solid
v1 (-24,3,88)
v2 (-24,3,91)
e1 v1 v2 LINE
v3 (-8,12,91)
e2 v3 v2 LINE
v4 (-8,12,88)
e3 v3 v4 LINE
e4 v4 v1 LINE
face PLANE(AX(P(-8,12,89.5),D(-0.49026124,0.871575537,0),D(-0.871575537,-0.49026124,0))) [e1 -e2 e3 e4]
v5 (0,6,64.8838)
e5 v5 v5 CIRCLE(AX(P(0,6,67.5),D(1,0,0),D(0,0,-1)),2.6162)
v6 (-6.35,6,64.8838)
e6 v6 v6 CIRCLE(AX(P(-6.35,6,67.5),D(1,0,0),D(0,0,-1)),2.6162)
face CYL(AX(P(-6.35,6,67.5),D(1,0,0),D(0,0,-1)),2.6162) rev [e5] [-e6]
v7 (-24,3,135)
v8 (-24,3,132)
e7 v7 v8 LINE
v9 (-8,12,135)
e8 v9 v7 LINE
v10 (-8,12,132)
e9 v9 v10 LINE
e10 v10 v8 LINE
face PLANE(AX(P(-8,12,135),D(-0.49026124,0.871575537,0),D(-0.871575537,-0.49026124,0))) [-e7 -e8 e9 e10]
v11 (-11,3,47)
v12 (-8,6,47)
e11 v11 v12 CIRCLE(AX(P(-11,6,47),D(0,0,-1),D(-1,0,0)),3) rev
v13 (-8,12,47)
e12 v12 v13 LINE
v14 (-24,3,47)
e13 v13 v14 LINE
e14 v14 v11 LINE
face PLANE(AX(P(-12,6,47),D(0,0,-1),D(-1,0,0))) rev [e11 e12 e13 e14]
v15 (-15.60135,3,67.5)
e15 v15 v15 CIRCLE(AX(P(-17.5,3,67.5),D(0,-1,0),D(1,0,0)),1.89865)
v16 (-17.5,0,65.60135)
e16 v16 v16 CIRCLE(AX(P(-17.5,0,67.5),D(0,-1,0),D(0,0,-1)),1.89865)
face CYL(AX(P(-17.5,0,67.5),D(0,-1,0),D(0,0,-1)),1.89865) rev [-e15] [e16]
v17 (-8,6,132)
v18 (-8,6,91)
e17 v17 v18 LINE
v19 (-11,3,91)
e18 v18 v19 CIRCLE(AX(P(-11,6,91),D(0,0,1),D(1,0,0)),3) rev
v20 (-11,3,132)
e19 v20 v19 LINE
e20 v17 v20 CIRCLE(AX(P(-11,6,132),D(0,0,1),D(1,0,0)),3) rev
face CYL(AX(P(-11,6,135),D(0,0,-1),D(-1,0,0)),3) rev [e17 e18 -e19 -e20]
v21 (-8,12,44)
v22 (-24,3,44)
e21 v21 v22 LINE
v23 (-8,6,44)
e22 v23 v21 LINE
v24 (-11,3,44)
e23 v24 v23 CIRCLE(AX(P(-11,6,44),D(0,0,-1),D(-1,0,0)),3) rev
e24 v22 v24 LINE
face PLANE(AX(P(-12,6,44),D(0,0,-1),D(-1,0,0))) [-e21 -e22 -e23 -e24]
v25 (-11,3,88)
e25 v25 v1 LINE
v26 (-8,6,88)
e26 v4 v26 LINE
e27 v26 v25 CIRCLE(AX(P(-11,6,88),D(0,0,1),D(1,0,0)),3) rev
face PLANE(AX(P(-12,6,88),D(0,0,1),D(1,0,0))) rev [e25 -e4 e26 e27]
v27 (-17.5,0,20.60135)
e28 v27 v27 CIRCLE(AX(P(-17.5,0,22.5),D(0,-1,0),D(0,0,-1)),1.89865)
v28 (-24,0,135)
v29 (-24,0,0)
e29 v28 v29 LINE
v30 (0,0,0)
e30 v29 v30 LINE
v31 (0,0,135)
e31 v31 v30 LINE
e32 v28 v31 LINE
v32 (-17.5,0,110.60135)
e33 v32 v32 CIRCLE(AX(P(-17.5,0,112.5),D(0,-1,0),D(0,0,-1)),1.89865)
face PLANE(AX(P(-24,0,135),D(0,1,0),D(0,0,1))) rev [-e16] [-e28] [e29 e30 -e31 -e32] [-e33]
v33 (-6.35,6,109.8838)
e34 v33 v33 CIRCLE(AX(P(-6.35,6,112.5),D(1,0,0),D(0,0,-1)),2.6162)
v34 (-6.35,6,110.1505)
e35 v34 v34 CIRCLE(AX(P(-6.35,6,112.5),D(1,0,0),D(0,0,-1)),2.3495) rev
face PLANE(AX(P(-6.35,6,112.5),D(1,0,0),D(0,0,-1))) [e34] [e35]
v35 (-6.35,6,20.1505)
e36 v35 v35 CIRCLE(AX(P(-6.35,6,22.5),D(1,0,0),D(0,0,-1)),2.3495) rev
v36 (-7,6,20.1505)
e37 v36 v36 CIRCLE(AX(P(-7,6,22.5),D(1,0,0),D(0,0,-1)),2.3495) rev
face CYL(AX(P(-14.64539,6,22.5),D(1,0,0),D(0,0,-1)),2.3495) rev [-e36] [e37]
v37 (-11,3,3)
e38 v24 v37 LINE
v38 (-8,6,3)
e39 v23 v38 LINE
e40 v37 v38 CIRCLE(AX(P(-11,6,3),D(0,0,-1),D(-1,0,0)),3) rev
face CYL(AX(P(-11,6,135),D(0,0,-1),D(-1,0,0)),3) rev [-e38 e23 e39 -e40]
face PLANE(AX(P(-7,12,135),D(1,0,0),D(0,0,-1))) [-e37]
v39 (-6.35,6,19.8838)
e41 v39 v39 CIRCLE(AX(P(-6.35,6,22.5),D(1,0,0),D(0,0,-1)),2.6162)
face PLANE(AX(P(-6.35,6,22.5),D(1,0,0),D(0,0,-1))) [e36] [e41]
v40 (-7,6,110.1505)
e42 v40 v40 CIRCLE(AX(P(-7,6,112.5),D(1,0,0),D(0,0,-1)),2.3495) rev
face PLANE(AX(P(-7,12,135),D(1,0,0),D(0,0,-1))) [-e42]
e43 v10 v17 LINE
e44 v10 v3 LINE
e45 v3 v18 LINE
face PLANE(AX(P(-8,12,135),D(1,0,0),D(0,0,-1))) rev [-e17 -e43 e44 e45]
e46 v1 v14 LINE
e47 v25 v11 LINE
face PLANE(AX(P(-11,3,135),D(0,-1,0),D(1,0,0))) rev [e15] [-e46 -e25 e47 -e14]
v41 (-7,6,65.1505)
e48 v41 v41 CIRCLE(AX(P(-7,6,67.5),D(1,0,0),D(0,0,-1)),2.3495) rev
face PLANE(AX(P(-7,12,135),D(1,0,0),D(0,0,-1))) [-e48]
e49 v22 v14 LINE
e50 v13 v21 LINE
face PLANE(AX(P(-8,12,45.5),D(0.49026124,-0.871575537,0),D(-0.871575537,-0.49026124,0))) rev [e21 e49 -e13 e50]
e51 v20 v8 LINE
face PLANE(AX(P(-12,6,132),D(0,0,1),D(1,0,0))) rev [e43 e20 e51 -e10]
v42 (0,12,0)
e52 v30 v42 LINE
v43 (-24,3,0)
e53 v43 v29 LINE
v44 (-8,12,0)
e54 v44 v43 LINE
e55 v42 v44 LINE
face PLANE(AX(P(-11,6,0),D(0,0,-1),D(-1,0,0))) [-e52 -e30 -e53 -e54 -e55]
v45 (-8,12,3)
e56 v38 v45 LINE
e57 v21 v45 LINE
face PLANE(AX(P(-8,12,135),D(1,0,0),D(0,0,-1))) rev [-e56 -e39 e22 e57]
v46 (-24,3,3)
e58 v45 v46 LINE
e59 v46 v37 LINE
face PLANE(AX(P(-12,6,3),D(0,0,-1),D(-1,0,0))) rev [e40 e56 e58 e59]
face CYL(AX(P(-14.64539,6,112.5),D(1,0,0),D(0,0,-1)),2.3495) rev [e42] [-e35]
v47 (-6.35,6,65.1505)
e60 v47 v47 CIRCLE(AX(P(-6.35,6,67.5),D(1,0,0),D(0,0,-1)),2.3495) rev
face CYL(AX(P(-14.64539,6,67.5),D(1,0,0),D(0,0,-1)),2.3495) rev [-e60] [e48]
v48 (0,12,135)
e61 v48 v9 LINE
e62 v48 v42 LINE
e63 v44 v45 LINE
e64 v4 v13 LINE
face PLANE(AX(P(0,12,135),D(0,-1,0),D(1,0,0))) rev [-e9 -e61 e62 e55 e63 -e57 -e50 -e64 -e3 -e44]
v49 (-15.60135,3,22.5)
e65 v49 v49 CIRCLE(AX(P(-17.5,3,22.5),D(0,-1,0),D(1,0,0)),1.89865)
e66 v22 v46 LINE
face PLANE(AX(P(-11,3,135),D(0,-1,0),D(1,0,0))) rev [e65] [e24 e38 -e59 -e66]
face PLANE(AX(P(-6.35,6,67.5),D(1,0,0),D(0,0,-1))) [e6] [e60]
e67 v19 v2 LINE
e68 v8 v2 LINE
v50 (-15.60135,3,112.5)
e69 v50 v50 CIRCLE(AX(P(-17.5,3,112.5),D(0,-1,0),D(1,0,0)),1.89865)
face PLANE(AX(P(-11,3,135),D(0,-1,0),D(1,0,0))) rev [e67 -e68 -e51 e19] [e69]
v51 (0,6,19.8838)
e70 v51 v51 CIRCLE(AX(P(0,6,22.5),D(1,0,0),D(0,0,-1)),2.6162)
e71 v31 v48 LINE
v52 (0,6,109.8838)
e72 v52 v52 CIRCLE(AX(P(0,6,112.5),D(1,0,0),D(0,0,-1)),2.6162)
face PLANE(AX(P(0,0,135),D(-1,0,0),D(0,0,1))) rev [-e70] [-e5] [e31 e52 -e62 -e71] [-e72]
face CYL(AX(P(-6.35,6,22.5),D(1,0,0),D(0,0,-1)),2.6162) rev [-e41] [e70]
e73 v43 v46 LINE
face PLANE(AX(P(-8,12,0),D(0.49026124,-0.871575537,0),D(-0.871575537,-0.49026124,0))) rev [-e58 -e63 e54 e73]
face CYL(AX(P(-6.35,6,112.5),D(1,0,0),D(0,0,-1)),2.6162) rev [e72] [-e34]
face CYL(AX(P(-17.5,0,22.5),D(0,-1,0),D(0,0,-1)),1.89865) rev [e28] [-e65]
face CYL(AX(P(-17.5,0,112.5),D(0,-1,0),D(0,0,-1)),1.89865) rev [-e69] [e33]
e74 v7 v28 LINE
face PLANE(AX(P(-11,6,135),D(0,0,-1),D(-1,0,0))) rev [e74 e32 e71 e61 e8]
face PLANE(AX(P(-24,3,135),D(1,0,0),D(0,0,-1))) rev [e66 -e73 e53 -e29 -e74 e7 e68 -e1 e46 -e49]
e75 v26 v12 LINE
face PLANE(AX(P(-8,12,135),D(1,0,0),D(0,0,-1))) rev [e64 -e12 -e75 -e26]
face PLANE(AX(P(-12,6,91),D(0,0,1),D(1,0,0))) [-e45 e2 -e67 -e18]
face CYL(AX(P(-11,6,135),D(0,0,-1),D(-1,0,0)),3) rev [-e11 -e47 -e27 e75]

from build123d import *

# Parameters (mm, degrees)
BOSS_EXTRUDE1_DEPTH   = 135
RIB3_REACH            = 95.436
SKETCH4_WALL_W        = 207.229173432
SKETCH4_WALL_H        = 3
RIB4_START            = -3
RIB4_DEPTH            = 3
F_6_CLEARANCE_HOLE1_D = 3.7973
SKETCH6_R             = 2.3495
CUT_EXTRUDE1_DEPTH    = 7
SKETCH12_R            = 2.6162
CUT_EXTRUDE2_DEPTH    = 6.35


# Read off the part's stored shape, not the designer's step: Rib4
with BuildPart() as part:
    # Sketch1 → Boss-Extrude1 (new body)
    with BuildSketch(Plane.XY):
        with BuildLine():
            Line((0, 0), (0, 12))
            Line((0, 12), (-8, 12))
            Line((-8, 12), (-8, 6))
            ThreePointArc((-8, 6), (-8.878679656, 3.878679656), (-11, 3))
            Line((-11, 3), (-24, 3))
            Line((-24, 3), (-24, 0))
            Line((-24, 0), (0, 0))
        make_face()
    extrude(amount=BOSS_EXTRUDE1_DEPTH)

    # Sketch4 wall → Rib3 (add, up to next)
    with BuildSketch(Plane(origin=(-16, 7.5, 45.5), x_dir=(-0.871575537125, -0.490261239633, 0), z_dir=(-0.490261239633, 0.871575537125, 0)), mode=Mode.PRIVATE) as rib3_sk1:
        Rectangle(SKETCH4_WALL_W, SKETCH4_WALL_H)
    rib3_tool1 = extrude(rib3_sk1.sketch, amount=-RIB3_REACH, mode=Mode.PRIVATE) - part.part
    rib3 = rib3_tool1.solids().sort_by_distance((-16, 7.5, 45.5))[0]
    add(rib3)

    # Rib4 outline → Rib4 (add)
    with BuildSketch(Plane(origin=(0, 0, 0), x_dir=(-1, 0, 0), z_dir=(0, 0, -1)).offset(RIB4_START)):
        with BuildLine():
            Line((24, 3), (8, 12))
            Line((8, 12), (8, 6))
            ThreePointArc((8, 6), (8.878679656, 3.878679656), (11, 3))
            Line((11, 3), (24, 3))
        make_face()
    rib4 = extrude(amount=RIB4_DEPTH)

    # Mirror1: Rib3, Rib4 across plane
    add(rib3.mirror(Plane(origin=(0, 0, 67.5), x_dir=(1, 0, 0), z_dir=(0, 0, -1))))
    add(rib4.mirror(Plane(origin=(0, 0, 67.5), x_dir=(1, 0, 0), z_dir=(0, 0, -1))))

    # #6 Clearance Hole1 (through all)
    with Locations(Plane(origin=(0, 0, 0), x_dir=(-1, 0, 0), z_dir=(0, -1, 0))):
        with Locations((17.5, -22.5), (17.5, -112.5), (17.5, -67.5)):
            Hole(F_6_CLEARANCE_HOLE1_D / 2)

    # Sketch6 → Cut-Extrude1 (cut)
    with BuildSketch(Plane(origin=(0, 0, 0), x_dir=(0, 0, -1), z_dir=(1, 0, 0))):
        with Locations((-112.5, 6)):
            Circle(SKETCH6_R)
        with Locations((-67.5, 6)):
            Circle(SKETCH6_R)
        with Locations((-22.5, 6)):
            Circle(SKETCH6_R)
    extrude(amount=-CUT_EXTRUDE1_DEPTH, mode=Mode.SUBTRACT)

    # Sketch12 → Cut-Extrude2 (cut)
    with BuildSketch(Plane(origin=(0, 0, 0), x_dir=(0, 0, -1), z_dir=(1, 0, 0))):
        with Locations((-112.5, 6)):
            Circle(SKETCH12_R)
        with Locations((-67.5, 6)):
            Circle(SKETCH12_R)
        with Locations((-22.5, 6)):
            Circle(SKETCH12_R)
    extrude(amount=-CUT_EXTRUDE2_DEPTH, mode=Mode.SUBTRACT)


solid = part.part
